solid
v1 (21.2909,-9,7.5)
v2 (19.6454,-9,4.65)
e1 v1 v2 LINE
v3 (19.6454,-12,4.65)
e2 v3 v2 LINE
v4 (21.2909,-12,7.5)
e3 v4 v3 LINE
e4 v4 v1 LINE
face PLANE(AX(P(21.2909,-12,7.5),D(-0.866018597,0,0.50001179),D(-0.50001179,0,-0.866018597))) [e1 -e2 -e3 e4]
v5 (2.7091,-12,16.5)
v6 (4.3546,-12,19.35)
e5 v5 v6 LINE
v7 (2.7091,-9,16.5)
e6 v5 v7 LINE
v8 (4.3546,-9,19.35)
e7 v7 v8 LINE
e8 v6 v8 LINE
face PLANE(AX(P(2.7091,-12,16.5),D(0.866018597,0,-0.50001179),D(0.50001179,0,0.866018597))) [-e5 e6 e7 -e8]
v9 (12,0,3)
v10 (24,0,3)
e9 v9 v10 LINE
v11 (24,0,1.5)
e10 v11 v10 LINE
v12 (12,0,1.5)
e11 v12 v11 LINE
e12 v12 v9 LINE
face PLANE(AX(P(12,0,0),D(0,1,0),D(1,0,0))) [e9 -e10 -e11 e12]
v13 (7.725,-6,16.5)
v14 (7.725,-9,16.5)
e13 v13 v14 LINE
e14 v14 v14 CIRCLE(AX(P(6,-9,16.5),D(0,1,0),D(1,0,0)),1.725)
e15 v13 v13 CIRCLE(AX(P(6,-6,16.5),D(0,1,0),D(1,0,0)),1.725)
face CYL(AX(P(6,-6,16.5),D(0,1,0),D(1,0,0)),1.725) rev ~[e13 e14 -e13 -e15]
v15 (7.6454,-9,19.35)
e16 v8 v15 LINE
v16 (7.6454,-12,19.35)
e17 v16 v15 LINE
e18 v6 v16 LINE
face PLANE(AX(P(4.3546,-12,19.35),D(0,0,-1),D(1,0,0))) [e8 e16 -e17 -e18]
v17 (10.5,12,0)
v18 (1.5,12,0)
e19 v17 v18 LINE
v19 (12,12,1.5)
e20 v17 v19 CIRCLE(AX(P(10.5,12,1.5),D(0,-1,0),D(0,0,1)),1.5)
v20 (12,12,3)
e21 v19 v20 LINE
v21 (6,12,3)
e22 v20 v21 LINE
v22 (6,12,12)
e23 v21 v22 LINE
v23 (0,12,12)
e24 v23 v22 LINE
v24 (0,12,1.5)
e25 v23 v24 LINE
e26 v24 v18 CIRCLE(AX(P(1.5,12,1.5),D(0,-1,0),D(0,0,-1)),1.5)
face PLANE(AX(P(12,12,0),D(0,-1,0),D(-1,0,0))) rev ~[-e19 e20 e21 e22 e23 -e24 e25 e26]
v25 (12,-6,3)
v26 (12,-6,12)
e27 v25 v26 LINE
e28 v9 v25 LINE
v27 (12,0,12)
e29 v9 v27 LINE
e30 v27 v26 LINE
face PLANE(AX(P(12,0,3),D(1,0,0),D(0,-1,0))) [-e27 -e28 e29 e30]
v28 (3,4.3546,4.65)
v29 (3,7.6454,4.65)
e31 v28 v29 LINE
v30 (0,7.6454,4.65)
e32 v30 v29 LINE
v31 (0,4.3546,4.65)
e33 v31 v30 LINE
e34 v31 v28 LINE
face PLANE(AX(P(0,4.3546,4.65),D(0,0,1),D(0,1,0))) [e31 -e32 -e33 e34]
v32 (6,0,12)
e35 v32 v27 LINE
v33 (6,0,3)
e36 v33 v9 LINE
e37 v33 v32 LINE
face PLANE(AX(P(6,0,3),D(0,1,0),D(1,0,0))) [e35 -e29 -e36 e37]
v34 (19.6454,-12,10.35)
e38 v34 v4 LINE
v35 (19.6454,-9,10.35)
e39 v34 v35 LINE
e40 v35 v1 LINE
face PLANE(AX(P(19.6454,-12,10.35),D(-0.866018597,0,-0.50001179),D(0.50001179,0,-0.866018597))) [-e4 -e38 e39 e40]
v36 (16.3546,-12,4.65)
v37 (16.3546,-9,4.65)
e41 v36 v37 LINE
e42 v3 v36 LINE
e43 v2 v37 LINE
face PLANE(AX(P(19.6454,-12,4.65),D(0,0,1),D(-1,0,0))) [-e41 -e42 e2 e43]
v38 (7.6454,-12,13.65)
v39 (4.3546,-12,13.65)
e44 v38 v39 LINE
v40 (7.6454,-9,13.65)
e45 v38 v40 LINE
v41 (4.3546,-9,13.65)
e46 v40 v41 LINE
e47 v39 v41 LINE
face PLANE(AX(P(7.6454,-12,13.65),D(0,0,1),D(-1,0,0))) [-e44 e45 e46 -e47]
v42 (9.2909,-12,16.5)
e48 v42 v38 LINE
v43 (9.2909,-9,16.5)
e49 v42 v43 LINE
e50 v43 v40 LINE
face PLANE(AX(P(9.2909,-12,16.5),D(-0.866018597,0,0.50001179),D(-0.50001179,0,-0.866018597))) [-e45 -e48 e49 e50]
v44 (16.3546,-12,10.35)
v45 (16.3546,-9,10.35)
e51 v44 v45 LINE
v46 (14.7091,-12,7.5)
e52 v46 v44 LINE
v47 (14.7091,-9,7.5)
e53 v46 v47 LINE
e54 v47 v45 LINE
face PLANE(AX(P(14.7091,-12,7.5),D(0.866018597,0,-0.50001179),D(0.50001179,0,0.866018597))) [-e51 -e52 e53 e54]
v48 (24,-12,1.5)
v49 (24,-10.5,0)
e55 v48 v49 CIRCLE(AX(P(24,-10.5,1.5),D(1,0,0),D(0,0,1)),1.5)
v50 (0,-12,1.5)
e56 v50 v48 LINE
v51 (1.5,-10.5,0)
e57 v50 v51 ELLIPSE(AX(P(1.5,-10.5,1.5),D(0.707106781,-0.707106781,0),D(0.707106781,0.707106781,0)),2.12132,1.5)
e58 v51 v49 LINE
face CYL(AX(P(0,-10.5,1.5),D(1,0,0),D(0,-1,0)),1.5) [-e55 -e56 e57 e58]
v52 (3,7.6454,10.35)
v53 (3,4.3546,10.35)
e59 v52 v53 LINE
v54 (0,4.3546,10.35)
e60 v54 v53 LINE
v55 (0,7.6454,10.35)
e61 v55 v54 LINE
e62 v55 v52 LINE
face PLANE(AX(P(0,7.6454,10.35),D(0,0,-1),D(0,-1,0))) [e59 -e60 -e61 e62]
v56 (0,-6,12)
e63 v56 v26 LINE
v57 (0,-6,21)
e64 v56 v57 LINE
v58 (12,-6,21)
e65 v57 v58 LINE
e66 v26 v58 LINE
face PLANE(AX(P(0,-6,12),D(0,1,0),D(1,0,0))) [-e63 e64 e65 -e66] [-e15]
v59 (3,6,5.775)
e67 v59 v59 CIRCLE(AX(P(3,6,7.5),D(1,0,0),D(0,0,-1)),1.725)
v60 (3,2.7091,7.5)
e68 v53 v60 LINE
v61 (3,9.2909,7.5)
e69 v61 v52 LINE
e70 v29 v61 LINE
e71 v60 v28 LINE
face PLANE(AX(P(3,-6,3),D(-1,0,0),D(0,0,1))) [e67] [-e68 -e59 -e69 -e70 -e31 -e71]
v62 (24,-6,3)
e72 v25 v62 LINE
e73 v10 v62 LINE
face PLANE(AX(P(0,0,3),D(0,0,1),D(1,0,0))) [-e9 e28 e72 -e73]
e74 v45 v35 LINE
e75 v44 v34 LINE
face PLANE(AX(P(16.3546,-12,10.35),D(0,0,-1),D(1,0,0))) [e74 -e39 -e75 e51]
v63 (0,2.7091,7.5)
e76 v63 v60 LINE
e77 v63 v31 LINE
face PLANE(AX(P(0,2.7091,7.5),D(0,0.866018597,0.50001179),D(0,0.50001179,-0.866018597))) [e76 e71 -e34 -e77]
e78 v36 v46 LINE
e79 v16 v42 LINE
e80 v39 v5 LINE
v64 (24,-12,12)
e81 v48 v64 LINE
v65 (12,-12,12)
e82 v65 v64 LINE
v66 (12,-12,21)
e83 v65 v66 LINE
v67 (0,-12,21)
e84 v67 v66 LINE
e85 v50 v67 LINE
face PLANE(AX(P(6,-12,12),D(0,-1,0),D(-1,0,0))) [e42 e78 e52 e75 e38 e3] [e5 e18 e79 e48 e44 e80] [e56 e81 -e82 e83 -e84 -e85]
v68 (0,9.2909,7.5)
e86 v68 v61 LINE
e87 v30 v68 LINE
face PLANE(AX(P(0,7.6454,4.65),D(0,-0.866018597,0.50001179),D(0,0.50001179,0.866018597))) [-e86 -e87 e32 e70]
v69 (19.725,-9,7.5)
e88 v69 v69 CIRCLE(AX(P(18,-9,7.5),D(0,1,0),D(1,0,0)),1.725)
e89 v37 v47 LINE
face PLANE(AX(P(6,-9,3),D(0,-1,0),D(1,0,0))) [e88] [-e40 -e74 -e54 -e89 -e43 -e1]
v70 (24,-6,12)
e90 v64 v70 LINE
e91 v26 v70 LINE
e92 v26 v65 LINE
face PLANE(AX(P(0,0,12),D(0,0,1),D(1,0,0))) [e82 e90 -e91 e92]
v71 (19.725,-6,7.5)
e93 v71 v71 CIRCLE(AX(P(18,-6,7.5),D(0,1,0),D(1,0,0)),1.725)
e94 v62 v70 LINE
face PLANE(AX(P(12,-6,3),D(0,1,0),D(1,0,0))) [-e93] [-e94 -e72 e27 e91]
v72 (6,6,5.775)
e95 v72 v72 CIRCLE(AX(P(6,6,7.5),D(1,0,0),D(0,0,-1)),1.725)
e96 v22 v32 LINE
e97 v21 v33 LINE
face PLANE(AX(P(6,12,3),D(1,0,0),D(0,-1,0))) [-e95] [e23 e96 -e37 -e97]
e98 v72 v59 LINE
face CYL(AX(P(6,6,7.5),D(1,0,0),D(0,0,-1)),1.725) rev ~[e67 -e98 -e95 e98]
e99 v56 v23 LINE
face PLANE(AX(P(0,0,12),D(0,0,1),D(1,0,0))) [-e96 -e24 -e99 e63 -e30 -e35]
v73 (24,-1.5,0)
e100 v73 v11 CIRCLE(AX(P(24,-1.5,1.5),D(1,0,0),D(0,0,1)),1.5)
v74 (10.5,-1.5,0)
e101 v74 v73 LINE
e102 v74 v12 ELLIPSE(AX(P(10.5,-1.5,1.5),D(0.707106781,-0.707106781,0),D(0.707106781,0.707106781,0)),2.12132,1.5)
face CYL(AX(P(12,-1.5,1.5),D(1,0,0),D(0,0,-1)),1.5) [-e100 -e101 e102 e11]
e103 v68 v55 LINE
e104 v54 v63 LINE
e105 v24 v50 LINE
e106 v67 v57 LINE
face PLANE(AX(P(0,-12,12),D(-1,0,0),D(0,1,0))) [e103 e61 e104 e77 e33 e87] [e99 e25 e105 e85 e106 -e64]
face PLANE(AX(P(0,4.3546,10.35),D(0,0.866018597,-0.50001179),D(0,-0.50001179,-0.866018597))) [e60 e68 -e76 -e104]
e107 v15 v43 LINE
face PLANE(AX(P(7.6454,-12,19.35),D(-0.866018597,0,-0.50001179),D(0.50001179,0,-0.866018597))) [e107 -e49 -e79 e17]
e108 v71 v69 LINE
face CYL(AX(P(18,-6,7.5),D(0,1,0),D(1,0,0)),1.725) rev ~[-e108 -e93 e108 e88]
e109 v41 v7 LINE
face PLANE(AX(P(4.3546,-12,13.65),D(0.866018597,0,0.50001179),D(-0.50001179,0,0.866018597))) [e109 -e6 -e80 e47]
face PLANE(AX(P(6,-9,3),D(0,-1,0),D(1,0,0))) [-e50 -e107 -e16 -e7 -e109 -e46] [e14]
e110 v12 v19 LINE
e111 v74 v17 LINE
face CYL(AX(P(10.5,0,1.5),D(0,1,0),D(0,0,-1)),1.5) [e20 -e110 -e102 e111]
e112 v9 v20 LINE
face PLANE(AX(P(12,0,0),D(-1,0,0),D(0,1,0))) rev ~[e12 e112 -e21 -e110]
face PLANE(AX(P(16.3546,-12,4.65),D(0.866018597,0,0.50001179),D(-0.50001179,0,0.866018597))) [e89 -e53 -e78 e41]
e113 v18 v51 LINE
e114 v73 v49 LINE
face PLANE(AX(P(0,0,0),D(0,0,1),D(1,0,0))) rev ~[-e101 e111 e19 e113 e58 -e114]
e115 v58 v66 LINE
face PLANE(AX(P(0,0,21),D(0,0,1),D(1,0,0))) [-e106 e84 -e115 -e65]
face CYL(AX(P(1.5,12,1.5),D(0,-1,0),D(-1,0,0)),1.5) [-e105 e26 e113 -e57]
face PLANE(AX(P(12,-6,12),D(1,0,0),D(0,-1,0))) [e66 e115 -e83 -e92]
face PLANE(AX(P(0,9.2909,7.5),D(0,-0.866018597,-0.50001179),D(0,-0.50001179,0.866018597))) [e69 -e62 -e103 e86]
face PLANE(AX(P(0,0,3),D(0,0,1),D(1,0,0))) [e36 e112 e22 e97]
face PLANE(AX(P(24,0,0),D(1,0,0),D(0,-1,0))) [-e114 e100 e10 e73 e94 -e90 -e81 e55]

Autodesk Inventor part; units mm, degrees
ref_plane "YZ Plane" through (0, 0, 0) normal (1, 0, 0) x (0, 1, 0)
ref_plane "XZ Plane" through (0, 0, 0) normal (0, 1, 0) x (-1, 0, 0)
ref_plane "XY Plane" through (0, 0, 0) normal (0, 0, 1) x (1, 0, 0)
sketch "Sketch1" plane through (0, 0, 0) normal (0, 0, 1) x (1, 0, 0)
  line L0 (0, 0) -> (12, 0)
  line L1 (12, 0) -> (12, 12)
  line L2 (12, 12) -> (0, 12)
  line L3 (0, 12) -> (0, 0)
  line L4 (12, 0) -> (0, 0)
  line L5 (0, 0) -> (0, -12)
  line L6 (0, -12) -> (12, -12)
  line L7 (12, -12) -> (12, 0)
  line L8 (12, 0) -> (24, 0)
  line L9 (24, 0) -> (24, -12)
  line L10 (24, -12) -> (12, -12)
  line L11 (12, -12) -> (12, 0)
  line L12 (0, -12) -> (-12, -12)
  line L13 (-12, -12) -> (-12, 0)
  line L14 (-12, 0) -> (0, 0)
  line L15 (0, 0) -> (0, -12)
  line L16 (0, -12) -> (12, -12)
  line L17 (12, -12) -> (12, -24)
  line L18 (12, -24) -> (0, -24)
  line L19 (0, -24) -> (0, -12)
  dimension "d0" = 12
  dimension "d1" = 12
  dimension "d2" = 12
  dimension "d3" = 12
  dimension "d4" = 12
  dimension "d5" = 12
  dimension "d6" = 12
  dimension "d7" = 12
  dimension "d8" = 12
  dimension "d9" = 12
extrude "Extrusion1" add sketch "Sketch1" along normal blind 3
sketch "Sketch2" plane through (0, 0, 3) normal (0, 0, 1) x (1, 0, 0)
  line L0 (-12, 0) -> (-12, -12) projected
  line L1 (-12, -12) -> (-12, -6)
  line L2 (-12, -6) -> (0, -6)
  line L3 (-12, -12) -> (0, -12) projected
  line L4 (0, -6) -> (0, -12)
  line L5 (0, -12) -> (-12, -12)
  line L6 (12, -24) -> (12, -12) projected
  line L7 (12, -12) -> (12, -6)
  line L8 (12, -6) -> (24, -6)
  line L9 (24, -12) -> (24, 0) projected
  line L10 (12, -12) -> (24, -12) projected
  line L11 (24, -6) -> (24, -12)
  line L12 (24, -12) -> (12, -12)
  line L13 (0, 0) -> (0, -6)
  line L14 (12, 0) -> (12, 12) projected
  line L15 (0, 0) -> (12, 0)
  line L16 (12, 0) -> (12, -6)
  line L17 (12, -12) -> (0, -12)
  line L18 (0, 12) -> (0, 0) projected
  line L19 (0, 0) -> (0, 12)
  line L20 (0, 12) -> (6, 12)
  line L21 (12, 12) -> (0, 12) projected
  line L22 (6, 12) -> (6, 0)
  line L23 (6, 0) -> (0, 0)
  line L24 (0, -12) -> (0, -24) projected
  line L25 (0, -12) -> (0, -24)
  line L26 (0, -24) -> (6, -24)
  line L27 (0, -24) -> (12, -24) projected
  line L28 (6, -24) -> (6, -12)
  line L29 (6, -12) -> (0, -12)
  dimension "d12" = 6
  dimension "d13" = 12
extrude "Extrusion2" add sketch "Sketch2" along normal blind 9 contours L2 L4 L3 L0 | L13 L15 L16 L7 L17 L4 | L17 L28 L26 L24 | L18 L20 L22 L15 | L7 L8 L9 L10
sketch "Sketch3" plane through (0, 0, 12) normal (0, 0, 1) x (1, 0, 0)
  line L0 (0, -6) -> (12, -6)
  line L1 (12, -12) -> (6, -12) projected
  line L2 (12, -6) -> (12, -12)
  line L3 (0, -12) -> (0, -24) projected
  line L4 (12, -12) -> (0, -12)
  line L5 (0, -12) -> (0, -6)
  point P0 (0, 0)
extrude "Extrusion3" add sketch "Sketch3" along normal blind 9
sketch "Sketch4" plane through (6, -12, 3) normal (0, -1, 0) x (1, 0, 0)
  point P0 (-6, -3)
sketch "Sketch5" plane through (-12, -6, 3) normal (0, 1, 0) x (1, 0, 0)
  circle A0 centre (6, -4.5) radius 1.725
  line L0 (0, 0) -> (0, -9) projected
  line L1 (12, -9) -> (0, -9) projected
  circle A1 centre (18, -13.5) radius 1.725
  line L2 (24, -18) -> (12, -18) projected
  line L3 (24, -9) -> (24, -18) projected
  circle A2 centre (30, -4.5) radius 1.725
  line L4 (36, 0) -> (36, -9) projected
  line L5 (36, -9) -> (24, -9) projected
  point P0 (12, 3)
  dimension "d19" = 3.45
  dimension "d20" = 6
  dimension "d21" = 4.5
  dimension "d22" = 3.45
  dimension "d23" = 4.5
  dimension "d24" = 6
  dimension "d25" = 3.45
  dimension "d26" = 6
  dimension "d27" = 4.5
extrude "Extrusion4" cut sketch "Sketch5" against normal blind 3
sketch "Sketch6" plane through (6, -12, 3) normal (0, -1, 0) x (1, 0, 0)
  circle A0 centre (-12, 4.5) radius 1.725 projected
  line L0 (-10.3546, 7.35) -> (-8.7091, 4.5)
  line L1 (-8.7091, 4.5) -> (-10.3546, 1.65)
  line L2 (-10.3546, 1.65) -> (-13.6454, 1.65)
  line L3 (-13.6454, 1.65) -> (-15.2909, 4.5)
  line L4 (-15.2909, 4.5) -> (-13.6454, 7.35)
  line L5 (-13.6454, 7.35) -> (-10.3546, 7.35)
  circle A1 centre (12, 4.5) radius 1.725 projected
  line L6 (13.6454, 7.35) -> (15.2909, 4.5)
  line L7 (15.2909, 4.5) -> (13.6454, 1.65)
  line L8 (13.6454, 1.65) -> (10.3546, 1.65)
  line L9 (10.3546, 1.65) -> (8.7091, 4.5)
  line L10 (8.7091, 4.5) -> (10.3546, 7.35)
  line L11 (10.3546, 7.35) -> (13.6454, 7.35)
  circle A2 centre (0, 13.5) radius 1.725 projected
  line L12 (1.6454, 16.35) -> (3.2909, 13.5)
  line L13 (3.2909, 13.5) -> (1.6454, 10.65)
  line L14 (1.6454, 10.65) -> (-1.6454, 10.65)
  line L15 (-1.6454, 10.65) -> (-3.2909, 13.5)
  line L16 (-3.2909, 13.5) -> (-1.6454, 16.35)
  line L17 (-1.6454, 16.35) -> (1.6454, 16.35)
  point P0 (-6, -3)
  dimension "d30" = 2.85
  dimension "d31" = 2.85
  dimension "d32" = 2.85
extrude "Extrusion5" cut sketch "Sketch6" against normal blind 3 contours A0 | L0 L1 L2 L3 L4 L5 | A1 | L6 L7 L8 L9 L10 L11 | A2 | L12 L13 L14 L15 L16 L17
sketch "Sketch7" plane through (6, 0, 3) normal (1, 0, 0) x (0, 0, -1)
  circle A0 centre (-4.5, 6) radius 1.725
  circle A1 centre (-4.5, -18) radius 1.725
  line L0 (-9, 0) -> (-9, 12) projected
  line L1 (-9, -24) -> (-9, -12) projected
  line L2 (0, -24) -> (-9, -24) projected
  line L3 (0, 12) -> (-9, 12) projected
  point P0 (3, 0)
  dimension "d35" = 3.45
  dimension "d36" = 3.45
  dimension "d37" = 4.5
  dimension "d38" = 4.5
  dimension "d39" = 6
  dimension "d40" = 6
extrude "Extrusion6" cut sketch "Sketch7" against normal blind 3
sketch "Sketch8" plane through (0, -6, 3) normal (-1, 0, 0) x (0, 0, 1)
  circle A0 centre (4.5, 12) radius 1.725 projected
  line L0 (1.65, 13.6454) -> (4.5, 15.2909)
  line L1 (4.5, 15.2909) -> (7.35, 13.6454)
  line L2 (7.35, 13.6454) -> (7.35, 10.3546)
  line L3 (7.35, 10.3546) -> (4.5, 8.7091)
  line L4 (4.5, 8.7091) -> (1.65, 10.3546)
  line L5 (1.65, 10.3546) -> (1.65, 13.6454)
  circle A1 centre (4.5, -12) radius 1.725 projected
  line L6 (1.65, -10.3546) -> (4.5, -8.7091)
  line L7 (4.5, -8.7091) -> (7.35, -10.3546)
  line L8 (7.35, -10.3546) -> (7.35, -13.6454)
  line L9 (7.35, -13.6454) -> (4.5, -15.2909)
  line L10 (4.5, -15.2909) -> (1.65, -13.6454)
  line L11 (1.65, -13.6454) -> (1.65, -10.3546)
  point P0 (-3, 6)
  dimension "d43" = 2.85
  dimension "d44" = 2.85
extrude "Extrusion7" cut sketch "Sketch8" against normal blind 3 contours A0 | L0 L1 L2 L3 L4 L5 | A1 | L6 L7 L8 L9 L10 L11
sketch "Sketch9" plane through (0, 0, 12) normal (0, 0, 1) x (1, 0, 0)
  line L0 (-12, -12) -> (0, -12) projected
  line L1 (0, 0) -> (-12, 0) projected
  line L2 (0, -12) -> (-12, -12)
  line L3 (-12, -12) -> (-12, 0)
  line L4 (-12, 0) -> (0, 0)
  line L5 (0, 0) -> (0, -12)
  line L6 (0, -12) -> (0, -24) projected
  line L7 (12, -24) -> (12, -12) projected
  line L8 (0, -24) -> (12, -24)
  line L9 (12, -24) -> (12, -12)
  line L10 (12, -12) -> (0, -12)
  line L11 (0, -12) -> (0, -24)
extrude "Extrusion8" cut sketch "Sketch9" against normal through all
fillet "Fillet2" radius 1.5 4 edges at (12, -12, 0) (0, 0, 0) (12, 6, 0) (18, 0, 0)
properties part number "twowayEastSouthVer1"
